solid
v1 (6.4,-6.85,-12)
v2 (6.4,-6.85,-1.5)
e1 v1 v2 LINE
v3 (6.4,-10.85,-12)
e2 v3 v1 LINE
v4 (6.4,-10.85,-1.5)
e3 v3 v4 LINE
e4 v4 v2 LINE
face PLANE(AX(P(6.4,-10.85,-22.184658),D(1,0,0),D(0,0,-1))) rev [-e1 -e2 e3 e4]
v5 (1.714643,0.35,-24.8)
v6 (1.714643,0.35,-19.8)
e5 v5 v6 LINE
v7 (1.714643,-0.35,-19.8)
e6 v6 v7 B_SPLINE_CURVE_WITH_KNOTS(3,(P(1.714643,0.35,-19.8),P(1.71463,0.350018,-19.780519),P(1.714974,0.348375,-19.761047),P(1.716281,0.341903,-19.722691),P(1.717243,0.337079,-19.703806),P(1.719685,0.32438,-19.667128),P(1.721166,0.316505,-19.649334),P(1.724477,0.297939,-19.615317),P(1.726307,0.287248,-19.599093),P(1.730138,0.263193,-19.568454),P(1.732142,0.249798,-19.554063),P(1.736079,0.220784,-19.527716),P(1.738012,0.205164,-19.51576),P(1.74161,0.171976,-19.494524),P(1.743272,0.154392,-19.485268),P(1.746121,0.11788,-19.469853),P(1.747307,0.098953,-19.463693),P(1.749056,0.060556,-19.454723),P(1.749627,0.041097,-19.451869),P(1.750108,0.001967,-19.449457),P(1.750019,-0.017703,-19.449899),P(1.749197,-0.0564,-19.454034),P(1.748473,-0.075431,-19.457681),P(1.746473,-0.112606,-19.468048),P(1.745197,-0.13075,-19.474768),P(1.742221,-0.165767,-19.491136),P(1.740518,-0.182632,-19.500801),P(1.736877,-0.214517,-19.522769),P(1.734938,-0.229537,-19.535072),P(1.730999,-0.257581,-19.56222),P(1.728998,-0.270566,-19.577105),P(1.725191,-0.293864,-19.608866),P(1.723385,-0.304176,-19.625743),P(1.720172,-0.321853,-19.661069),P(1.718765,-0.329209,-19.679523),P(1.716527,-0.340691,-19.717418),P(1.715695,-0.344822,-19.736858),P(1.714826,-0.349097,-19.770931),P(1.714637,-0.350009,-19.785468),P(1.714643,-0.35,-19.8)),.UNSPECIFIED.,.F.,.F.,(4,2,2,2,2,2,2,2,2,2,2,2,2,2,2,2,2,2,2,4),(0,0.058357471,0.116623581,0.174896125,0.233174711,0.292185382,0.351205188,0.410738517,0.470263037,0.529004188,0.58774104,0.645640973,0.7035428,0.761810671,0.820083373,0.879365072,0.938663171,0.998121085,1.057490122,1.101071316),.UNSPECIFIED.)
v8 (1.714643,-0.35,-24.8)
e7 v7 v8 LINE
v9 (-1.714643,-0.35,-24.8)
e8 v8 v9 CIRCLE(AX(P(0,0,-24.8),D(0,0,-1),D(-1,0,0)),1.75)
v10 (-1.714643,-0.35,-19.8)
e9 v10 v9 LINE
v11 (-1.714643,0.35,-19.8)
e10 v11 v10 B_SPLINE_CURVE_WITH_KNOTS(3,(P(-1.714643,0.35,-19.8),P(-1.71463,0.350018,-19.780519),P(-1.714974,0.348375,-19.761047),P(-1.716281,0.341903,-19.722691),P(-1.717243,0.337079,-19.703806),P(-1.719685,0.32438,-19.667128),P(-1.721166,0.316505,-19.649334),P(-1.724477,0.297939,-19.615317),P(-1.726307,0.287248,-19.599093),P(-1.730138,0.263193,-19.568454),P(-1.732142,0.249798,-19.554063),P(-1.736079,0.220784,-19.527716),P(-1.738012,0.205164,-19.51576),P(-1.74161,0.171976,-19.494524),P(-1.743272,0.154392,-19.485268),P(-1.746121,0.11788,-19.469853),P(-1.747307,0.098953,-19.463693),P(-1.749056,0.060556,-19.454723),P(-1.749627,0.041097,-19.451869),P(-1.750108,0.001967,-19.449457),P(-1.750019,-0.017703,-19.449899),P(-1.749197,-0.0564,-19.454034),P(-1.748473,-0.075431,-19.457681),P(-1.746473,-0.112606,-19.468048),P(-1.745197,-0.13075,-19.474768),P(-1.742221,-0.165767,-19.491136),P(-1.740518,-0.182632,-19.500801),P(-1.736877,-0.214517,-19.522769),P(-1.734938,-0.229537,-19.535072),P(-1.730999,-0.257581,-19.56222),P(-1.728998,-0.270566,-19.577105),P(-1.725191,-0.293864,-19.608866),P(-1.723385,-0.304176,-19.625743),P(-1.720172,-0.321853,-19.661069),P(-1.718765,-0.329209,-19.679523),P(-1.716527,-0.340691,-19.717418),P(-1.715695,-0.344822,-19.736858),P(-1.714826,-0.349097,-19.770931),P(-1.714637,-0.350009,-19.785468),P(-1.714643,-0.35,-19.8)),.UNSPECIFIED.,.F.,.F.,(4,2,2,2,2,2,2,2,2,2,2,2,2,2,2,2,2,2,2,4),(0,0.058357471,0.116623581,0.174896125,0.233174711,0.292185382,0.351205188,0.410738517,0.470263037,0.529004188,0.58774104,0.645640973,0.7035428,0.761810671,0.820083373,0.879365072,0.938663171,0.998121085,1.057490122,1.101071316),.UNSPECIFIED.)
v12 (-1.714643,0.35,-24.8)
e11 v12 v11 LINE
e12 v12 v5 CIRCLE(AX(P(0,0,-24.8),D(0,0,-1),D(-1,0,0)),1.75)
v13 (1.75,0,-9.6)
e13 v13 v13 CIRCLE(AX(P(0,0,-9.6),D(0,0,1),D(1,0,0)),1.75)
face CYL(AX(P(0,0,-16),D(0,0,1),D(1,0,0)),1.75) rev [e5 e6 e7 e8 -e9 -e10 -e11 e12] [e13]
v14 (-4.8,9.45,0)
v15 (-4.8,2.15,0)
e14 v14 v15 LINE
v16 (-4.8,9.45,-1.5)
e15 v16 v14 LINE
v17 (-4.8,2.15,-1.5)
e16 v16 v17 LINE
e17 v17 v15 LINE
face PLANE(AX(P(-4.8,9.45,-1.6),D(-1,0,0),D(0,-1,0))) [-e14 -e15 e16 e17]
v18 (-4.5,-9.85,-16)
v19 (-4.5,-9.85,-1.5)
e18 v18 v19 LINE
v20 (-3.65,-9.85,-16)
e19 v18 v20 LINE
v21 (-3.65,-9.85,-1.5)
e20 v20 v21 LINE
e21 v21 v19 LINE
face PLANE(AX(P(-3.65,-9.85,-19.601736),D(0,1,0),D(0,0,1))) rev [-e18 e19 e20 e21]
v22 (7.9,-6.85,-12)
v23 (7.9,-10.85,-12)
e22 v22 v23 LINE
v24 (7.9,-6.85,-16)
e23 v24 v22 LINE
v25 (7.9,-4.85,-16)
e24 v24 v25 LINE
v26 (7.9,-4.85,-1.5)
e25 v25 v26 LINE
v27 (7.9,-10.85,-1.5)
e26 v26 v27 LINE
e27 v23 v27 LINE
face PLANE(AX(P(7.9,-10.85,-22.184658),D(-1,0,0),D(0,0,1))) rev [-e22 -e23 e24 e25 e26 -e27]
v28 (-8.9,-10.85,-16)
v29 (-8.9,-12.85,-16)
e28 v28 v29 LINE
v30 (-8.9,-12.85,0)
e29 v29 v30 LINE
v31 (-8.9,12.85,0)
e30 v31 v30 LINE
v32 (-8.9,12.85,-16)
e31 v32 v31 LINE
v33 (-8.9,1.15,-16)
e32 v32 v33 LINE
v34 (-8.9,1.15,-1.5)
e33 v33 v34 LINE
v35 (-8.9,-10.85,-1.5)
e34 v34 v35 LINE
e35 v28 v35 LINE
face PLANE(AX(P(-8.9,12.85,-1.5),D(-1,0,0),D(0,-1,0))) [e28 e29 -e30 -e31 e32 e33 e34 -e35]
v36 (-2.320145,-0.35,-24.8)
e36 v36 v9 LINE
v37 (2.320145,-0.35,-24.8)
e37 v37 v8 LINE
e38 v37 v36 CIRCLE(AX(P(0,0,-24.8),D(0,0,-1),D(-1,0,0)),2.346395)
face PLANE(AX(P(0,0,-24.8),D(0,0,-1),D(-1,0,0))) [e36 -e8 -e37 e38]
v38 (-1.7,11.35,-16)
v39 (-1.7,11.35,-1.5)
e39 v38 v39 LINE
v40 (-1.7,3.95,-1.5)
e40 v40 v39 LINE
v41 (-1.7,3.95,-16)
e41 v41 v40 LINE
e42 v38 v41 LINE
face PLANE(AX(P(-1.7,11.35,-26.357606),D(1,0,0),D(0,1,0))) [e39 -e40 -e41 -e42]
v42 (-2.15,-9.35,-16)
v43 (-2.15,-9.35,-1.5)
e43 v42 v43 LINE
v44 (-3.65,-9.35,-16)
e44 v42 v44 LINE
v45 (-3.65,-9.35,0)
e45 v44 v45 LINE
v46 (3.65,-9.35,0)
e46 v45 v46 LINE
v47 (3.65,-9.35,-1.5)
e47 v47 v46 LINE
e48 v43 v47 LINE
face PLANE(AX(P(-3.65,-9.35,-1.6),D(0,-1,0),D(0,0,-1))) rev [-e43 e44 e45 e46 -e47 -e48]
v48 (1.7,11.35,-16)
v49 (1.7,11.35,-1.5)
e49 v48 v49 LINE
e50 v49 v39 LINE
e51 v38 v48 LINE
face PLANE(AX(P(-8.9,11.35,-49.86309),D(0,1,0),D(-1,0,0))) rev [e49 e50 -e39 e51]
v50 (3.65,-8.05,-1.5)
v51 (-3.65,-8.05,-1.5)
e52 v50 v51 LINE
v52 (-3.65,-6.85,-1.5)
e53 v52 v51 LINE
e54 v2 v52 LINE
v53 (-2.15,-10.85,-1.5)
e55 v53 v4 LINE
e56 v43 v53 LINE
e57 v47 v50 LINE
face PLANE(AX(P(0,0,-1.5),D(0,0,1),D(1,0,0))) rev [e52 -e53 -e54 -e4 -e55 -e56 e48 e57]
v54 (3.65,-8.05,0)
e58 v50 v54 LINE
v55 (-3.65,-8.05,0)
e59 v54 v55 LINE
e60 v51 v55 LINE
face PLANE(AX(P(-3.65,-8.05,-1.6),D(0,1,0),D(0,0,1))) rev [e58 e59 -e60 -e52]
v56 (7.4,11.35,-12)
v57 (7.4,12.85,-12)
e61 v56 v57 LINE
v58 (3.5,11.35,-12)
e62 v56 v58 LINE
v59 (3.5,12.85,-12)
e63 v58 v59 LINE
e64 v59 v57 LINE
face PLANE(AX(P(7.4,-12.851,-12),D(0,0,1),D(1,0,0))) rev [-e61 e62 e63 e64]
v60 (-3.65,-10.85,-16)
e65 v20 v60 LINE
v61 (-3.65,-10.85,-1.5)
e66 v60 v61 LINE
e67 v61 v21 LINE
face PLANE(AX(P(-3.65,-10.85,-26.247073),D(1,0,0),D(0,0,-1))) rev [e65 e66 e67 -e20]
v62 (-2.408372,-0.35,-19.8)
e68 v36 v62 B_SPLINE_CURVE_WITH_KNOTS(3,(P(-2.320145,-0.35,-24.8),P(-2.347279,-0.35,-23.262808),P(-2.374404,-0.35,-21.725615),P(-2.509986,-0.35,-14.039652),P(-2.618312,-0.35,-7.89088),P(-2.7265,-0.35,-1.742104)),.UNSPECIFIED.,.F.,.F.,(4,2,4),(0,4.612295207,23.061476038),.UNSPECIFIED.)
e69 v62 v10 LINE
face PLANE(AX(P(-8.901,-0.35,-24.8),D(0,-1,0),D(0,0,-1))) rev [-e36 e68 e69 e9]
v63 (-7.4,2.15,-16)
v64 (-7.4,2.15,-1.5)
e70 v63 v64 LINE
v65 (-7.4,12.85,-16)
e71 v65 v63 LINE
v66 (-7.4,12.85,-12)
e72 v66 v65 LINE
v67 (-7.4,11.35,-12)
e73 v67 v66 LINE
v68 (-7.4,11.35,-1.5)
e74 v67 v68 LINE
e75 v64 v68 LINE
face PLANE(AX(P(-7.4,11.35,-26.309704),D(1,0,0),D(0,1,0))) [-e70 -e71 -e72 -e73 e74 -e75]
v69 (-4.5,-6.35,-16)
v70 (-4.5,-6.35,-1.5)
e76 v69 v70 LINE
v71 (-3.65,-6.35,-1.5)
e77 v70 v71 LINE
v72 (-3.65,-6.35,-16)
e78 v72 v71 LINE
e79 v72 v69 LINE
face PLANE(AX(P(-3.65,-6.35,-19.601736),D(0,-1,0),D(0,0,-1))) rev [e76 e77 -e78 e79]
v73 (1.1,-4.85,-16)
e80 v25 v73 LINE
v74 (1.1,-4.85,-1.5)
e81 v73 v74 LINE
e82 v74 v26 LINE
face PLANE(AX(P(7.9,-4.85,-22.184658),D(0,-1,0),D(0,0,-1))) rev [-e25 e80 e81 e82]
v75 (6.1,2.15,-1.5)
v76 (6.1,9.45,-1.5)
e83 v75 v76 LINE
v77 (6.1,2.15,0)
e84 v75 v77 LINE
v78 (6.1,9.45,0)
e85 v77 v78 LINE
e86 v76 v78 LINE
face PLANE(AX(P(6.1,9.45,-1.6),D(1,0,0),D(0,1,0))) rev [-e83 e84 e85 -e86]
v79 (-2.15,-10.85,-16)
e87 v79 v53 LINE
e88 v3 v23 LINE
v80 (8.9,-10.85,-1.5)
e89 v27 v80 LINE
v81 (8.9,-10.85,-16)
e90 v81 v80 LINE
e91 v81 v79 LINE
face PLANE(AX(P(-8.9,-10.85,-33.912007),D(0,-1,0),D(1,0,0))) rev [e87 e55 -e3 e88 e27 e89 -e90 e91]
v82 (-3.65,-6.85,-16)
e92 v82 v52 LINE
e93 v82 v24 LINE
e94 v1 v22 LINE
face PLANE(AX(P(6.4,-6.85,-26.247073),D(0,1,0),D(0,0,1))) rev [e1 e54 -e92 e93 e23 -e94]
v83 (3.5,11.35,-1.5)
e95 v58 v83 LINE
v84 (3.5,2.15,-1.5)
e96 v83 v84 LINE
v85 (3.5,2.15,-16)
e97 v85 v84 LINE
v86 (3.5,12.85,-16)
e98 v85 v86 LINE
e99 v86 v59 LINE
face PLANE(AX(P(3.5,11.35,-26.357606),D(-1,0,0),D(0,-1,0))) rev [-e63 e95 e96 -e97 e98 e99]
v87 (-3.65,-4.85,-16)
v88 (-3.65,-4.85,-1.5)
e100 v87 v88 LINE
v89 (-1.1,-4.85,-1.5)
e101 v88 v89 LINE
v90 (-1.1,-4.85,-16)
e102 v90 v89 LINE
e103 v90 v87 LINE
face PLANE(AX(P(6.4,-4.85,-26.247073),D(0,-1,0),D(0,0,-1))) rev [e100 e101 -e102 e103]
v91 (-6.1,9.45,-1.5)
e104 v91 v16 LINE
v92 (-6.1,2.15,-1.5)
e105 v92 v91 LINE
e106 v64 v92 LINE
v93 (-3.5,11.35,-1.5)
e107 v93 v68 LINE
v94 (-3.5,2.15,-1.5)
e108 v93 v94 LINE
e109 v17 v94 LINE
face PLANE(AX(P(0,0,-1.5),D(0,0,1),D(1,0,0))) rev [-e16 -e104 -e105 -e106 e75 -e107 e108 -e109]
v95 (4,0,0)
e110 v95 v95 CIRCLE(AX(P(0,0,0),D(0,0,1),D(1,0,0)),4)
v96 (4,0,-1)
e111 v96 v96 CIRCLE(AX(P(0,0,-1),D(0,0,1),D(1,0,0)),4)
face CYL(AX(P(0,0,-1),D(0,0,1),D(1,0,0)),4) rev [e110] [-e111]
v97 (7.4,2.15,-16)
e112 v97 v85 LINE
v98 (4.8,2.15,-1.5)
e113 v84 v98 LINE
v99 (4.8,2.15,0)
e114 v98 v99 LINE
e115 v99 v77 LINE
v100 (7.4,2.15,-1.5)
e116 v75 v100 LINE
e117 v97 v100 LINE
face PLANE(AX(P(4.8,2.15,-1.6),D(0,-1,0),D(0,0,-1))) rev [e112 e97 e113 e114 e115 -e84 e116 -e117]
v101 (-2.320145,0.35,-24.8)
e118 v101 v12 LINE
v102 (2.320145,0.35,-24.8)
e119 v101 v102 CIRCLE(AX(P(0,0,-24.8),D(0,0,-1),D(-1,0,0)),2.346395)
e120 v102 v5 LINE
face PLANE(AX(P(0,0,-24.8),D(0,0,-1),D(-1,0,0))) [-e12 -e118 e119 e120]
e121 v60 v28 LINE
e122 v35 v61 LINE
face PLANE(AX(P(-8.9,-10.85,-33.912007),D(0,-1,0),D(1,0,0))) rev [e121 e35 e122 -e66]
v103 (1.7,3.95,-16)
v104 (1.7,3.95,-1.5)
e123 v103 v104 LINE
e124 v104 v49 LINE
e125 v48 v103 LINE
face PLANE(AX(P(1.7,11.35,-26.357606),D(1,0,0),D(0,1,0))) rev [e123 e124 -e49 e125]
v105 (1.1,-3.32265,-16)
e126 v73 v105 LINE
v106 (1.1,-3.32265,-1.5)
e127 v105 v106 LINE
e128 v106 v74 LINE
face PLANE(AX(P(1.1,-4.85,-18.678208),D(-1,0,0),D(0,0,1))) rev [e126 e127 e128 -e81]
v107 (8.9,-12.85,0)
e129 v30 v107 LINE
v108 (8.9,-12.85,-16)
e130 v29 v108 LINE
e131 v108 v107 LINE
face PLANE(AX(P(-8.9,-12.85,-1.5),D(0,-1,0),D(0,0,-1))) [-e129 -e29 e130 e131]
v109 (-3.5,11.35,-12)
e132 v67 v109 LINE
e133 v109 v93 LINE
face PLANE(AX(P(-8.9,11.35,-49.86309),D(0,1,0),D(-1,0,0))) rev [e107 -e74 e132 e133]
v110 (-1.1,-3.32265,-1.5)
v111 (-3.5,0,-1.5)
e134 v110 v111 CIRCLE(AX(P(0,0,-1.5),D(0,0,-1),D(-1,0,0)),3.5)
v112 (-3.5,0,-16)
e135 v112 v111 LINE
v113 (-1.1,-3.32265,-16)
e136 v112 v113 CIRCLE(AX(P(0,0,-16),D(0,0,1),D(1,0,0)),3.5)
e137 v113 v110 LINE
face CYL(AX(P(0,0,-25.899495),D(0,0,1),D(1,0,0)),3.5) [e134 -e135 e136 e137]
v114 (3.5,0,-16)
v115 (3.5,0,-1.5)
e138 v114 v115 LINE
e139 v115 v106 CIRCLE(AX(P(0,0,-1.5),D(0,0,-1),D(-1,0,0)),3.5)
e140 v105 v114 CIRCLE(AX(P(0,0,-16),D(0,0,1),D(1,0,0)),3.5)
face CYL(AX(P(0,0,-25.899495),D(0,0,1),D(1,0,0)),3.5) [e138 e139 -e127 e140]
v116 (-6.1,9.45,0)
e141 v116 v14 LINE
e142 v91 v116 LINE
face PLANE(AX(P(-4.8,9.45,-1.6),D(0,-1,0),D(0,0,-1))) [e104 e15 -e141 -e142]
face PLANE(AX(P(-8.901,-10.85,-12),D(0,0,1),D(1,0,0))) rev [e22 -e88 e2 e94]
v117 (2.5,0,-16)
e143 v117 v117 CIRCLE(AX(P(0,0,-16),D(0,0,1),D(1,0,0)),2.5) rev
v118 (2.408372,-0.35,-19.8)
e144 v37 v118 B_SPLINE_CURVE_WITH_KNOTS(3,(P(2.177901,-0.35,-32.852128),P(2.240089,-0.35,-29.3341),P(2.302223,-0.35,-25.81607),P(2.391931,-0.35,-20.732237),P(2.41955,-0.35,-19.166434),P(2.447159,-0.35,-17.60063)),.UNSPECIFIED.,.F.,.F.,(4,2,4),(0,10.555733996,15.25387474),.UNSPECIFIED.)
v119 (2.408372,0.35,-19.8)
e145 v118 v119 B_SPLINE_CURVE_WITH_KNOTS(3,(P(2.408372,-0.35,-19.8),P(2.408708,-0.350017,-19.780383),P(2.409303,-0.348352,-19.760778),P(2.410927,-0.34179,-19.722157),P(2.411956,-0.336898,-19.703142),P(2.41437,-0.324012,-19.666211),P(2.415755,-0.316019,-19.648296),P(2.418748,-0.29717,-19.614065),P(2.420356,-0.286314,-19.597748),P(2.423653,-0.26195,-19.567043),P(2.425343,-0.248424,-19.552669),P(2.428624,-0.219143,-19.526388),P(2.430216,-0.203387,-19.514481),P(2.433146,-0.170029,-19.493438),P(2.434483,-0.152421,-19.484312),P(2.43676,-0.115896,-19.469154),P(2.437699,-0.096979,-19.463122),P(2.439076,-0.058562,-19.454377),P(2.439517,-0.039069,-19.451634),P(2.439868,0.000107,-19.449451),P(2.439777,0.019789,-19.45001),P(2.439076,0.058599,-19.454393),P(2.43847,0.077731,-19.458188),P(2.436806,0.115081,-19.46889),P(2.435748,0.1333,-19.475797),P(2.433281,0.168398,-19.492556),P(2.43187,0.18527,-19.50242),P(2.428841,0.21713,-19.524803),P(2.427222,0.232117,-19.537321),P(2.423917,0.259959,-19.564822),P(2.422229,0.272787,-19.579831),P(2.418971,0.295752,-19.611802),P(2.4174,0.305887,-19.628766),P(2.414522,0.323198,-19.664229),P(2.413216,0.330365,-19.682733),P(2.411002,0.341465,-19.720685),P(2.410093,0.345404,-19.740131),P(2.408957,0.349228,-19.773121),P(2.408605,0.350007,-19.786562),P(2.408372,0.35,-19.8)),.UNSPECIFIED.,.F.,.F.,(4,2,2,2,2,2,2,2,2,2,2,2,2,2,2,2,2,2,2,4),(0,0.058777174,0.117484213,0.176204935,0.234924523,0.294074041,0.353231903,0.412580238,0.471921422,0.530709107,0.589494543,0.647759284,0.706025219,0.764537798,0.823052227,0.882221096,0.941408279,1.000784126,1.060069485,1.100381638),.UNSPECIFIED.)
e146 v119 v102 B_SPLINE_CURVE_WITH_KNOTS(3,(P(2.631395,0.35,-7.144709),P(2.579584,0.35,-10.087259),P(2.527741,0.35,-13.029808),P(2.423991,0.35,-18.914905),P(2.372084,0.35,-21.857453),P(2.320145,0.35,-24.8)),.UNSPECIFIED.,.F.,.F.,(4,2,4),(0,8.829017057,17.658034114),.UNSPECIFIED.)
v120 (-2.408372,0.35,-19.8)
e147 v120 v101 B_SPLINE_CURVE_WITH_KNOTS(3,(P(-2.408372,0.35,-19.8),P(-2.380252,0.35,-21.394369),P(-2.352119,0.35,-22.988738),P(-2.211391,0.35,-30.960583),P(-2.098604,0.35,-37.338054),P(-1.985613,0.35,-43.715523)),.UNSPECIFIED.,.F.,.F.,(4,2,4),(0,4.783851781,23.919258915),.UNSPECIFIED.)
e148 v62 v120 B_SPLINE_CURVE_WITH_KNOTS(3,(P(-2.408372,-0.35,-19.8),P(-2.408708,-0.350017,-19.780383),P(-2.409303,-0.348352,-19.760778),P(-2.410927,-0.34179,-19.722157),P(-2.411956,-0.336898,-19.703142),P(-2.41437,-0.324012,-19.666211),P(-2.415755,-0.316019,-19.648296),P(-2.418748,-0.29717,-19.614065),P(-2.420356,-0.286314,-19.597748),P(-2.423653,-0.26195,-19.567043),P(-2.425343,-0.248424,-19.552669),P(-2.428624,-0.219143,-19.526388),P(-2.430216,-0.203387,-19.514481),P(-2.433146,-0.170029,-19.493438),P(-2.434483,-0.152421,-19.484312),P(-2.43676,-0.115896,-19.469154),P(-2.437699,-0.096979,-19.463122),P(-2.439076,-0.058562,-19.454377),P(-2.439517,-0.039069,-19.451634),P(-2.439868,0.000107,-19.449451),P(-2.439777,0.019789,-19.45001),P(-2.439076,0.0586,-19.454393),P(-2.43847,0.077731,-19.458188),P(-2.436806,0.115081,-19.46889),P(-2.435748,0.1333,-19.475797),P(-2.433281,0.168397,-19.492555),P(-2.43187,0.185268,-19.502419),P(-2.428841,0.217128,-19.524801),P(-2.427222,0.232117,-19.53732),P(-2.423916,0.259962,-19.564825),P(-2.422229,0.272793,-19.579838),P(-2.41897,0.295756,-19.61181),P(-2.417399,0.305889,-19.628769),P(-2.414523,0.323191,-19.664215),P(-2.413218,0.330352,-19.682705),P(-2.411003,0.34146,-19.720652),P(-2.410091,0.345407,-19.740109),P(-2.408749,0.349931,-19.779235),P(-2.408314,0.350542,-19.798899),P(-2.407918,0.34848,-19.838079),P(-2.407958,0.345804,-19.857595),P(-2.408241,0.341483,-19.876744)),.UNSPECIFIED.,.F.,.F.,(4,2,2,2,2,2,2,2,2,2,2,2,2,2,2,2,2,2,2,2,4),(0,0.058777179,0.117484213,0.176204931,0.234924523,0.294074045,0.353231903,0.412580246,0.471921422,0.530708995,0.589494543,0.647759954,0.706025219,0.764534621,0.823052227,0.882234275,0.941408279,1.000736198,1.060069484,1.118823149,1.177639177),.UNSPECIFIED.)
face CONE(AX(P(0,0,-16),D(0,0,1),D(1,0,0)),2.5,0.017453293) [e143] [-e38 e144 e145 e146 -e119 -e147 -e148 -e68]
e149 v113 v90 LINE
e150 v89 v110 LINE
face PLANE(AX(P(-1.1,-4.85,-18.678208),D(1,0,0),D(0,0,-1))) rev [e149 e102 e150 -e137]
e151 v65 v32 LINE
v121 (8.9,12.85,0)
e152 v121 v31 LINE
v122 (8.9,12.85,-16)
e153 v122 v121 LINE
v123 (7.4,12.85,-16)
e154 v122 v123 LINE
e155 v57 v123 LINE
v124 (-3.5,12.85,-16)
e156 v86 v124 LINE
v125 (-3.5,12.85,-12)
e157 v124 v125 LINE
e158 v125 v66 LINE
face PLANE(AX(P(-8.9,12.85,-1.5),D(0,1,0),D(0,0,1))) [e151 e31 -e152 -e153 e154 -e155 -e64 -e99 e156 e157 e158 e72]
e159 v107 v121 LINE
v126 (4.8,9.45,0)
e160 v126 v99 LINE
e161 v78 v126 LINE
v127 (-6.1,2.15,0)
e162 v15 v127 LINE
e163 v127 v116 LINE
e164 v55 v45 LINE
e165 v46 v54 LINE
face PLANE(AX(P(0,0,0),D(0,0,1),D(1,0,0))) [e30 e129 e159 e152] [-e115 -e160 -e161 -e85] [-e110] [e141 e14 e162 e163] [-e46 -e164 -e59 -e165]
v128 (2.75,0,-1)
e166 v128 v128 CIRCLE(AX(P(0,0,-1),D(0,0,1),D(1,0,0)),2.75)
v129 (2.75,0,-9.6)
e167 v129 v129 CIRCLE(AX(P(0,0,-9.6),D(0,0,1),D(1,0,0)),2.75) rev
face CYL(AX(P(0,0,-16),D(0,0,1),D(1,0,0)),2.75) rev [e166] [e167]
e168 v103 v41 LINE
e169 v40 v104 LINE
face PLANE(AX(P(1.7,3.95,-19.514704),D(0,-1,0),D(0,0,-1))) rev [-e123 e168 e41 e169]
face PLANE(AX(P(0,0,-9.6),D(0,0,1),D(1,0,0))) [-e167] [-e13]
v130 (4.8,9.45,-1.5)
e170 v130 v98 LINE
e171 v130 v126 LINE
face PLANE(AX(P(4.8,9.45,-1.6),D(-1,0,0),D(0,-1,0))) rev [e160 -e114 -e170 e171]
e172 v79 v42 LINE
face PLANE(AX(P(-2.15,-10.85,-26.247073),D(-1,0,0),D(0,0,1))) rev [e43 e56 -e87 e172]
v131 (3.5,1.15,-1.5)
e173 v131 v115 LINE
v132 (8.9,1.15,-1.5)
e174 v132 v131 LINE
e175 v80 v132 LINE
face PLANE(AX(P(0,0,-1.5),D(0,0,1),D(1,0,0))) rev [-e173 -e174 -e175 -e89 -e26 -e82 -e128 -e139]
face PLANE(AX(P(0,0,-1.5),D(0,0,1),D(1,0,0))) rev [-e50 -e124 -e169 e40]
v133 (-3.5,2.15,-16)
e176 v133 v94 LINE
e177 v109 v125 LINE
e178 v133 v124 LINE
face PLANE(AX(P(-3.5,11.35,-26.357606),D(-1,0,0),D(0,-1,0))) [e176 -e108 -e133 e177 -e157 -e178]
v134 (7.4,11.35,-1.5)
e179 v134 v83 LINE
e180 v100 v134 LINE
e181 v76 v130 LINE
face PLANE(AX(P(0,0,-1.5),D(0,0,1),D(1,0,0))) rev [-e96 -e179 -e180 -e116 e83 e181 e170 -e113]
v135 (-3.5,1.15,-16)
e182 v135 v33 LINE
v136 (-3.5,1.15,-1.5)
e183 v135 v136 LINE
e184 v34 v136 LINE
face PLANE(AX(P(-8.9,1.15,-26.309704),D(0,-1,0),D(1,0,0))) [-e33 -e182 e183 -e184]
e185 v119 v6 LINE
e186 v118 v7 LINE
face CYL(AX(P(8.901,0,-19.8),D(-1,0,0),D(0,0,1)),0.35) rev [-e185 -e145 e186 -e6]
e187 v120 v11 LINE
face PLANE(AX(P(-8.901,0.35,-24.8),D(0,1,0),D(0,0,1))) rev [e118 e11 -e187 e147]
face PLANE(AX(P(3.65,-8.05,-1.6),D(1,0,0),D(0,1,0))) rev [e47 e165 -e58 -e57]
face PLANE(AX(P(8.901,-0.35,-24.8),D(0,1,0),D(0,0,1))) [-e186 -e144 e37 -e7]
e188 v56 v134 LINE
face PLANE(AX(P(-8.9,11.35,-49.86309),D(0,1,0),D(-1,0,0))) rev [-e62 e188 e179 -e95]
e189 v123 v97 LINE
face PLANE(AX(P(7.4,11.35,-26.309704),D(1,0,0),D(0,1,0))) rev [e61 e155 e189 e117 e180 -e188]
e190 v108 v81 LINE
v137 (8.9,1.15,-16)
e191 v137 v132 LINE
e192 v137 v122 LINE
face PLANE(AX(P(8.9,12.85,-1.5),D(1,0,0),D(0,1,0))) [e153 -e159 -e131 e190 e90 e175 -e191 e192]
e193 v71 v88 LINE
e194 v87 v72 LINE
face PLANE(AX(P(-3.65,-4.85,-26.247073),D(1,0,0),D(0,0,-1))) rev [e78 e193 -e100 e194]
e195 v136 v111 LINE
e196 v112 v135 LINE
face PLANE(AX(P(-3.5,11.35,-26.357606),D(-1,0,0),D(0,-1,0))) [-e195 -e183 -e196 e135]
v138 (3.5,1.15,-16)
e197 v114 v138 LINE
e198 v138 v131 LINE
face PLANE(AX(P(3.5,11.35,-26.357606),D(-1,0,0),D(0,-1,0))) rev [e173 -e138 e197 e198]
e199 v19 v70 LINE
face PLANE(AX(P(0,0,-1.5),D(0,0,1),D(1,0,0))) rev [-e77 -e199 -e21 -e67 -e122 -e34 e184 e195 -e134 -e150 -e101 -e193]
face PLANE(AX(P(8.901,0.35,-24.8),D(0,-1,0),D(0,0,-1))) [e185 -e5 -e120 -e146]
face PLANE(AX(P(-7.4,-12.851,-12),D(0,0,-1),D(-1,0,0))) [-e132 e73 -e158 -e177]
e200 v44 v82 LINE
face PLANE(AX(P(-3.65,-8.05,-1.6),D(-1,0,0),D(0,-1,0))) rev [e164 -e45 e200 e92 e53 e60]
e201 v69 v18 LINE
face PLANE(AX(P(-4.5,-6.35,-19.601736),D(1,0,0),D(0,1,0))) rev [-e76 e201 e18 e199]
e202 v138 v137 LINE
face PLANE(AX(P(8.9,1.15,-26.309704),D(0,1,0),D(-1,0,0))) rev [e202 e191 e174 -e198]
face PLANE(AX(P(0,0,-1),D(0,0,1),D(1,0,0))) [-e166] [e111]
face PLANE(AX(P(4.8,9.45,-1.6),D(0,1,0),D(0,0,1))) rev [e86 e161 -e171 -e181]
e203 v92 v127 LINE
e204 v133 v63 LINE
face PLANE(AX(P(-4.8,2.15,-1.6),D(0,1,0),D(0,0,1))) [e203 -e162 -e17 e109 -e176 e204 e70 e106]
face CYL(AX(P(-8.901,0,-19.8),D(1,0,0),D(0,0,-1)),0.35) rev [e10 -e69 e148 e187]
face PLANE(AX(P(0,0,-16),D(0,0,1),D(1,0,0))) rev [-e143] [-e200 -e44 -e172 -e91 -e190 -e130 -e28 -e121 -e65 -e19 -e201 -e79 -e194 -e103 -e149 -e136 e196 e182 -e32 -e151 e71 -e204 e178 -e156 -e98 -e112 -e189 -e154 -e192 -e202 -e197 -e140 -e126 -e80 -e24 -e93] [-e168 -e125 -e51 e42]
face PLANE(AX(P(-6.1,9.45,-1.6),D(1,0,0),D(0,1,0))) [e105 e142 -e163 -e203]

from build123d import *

# Parameters (mm, degrees)
BASES_W                              = 17.8
BASES_H                              = 25.7
BASE_DEPTH                           = 1.5
NEUTRALS_W                           = 1.3
NEUTRALS_H                           = 7.3
NEUTRAL_DEPTH                        = 1.6
FASTENERACCESSS_R                    = 4
FASTENER_ACCESS_DEPTH                = 1
GROUNDS_W                            = 7.3
GROUNDS_H                            = 1.3
GROUND_DEPTH                         = 1.6
BASETOPS_W                           = 17.8
BASETOPS_H                           = 1.5
BASE_TOP_DEPTH                       = 14.5
BASERIGHTWALLS_W                     = 1.5
BASERIGHTWALLS_H                     = 10.2
BASE_RIGHT_WALL_DEPTH                = 14.5
CONNECTORWALLS_W                     = 1.8
CONNECTORWALLS_H                     = 10.2
CONNECTOR_WALL_DEPTH                 = 14.5
CONNECTOR_LOCATE_REACH               = 33.555
CONNECTORLOCATES_W                   = 3.9
CONNECTORLOCATES_H                   = 4
BASEBOTTOMS_W                        = 17.8
BASEBOTTOMS_H                        = 2
BASE_BOTTOM_DEPTH                    = 14.5
FASTENERACCESSHOLEEXTENDS_R          = 2.75
FASTENER_ACCESS_HOLE_EXTEND_DEPTH    = 22.664083179
FASTENER_HOLDING_BODY_DEPTH          = 14.5
FASTENERHOLDINGTOPBORES_R            = 2.75
FASTENER_HOLDING_TOP_BORE_DEPTH      = 8.1
FASTENERHOLDINGBORES_R               = 1.75
FASTENER_HOLDING_BORE_DEPTH          = 19.343731899
ELECTRICALCONNECTIONBASES_W          = 3.9
ELECTRICALCONNECTIONBASES_H          = 1
ELECTRICAL_CONNECTION_BASE_DEPTH     = 14.5
CONNECTIONS_MIDWALL_JOINT_DEPTH      = 14.5
FASTENERHOLDINGEXTENDEDBODYS_R       = 2.5
FASTENERHOLDINGEXTENDEDBODYS_R_2     = 1.75
FASTENER_HOLDING_EXTENDED_BODY_DEPTH = 8.8
FHEB_SLOT_REACH                      = 31.315
FHEB_SLOT_DIRECTION_2_REACH          = 31.315
MIDWALLENDS_W                        = 2.2
MIDWALLENDS_H                        = 1.527350455
MID_WALL_END_DEPTH                   = 14.5
GROUNDWALLS_W                        = 1.5
GROUNDWALLS_H                        = 6
GROUND_WALL_DEPTH                    = 14.5
GROUNDEXTENDEDWALLSS_W               = 10.05
GROUNDEXTENDEDWALLSS_H               = 2
GROUNDEXTENDEDWALLSS_W_2             = 1.5
GROUNDEXTENDEDWALLSS_H_2             = 1.5
GROUND_EXTENDED_WALLS_DEPTH          = 14.5
GROUNDENDWALLS_W                     = 0.85
GROUNDENDWALLS_H                     = 3.5
GROUND_END_WALL_DEPTH                = 14.5
GROUND_CONNECTOR_LOCATE_REACH        = 34.595
GROUNDCONNECTORLOCATES_W             = 4
GROUNDCONNECTORLOCATES_H             = 4


# Read off the part's stored shape, not the designer's step: FHEB DRAFT
with BuildPart() as part:
    # BaseS → BASE (new body)
    with BuildSketch(Plane.XY):
        Rectangle(BASES_W, BASES_H)
    extrude(amount=-BASE_DEPTH)

    # NeutralS → NEUTRAL (cut)
    with BuildSketch(Plane.XY):
        with Locations((5.45, 5.8)):
            Rectangle(NEUTRALS_W, NEUTRALS_H)
    neutral = extrude(amount=-NEUTRAL_DEPTH, mode=Mode.SUBTRACT)

    # LINE HM: NEUTRAL across plane
    add(neutral.mirror(Plane(origin=(0, 0, 0), x_dir=(0, 0, 1), z_dir=(1, 0, 0))), mode=Mode.SUBTRACT)

    # FastenerAccessS → FASTENER ACCESS (cut)
    with BuildSketch(Plane.XY):
        Circle(FASTENERACCESSS_R)
    extrude(amount=-FASTENER_ACCESS_DEPTH, mode=Mode.SUBTRACT)

    # GroundS → GROUND (cut)
    with BuildSketch(Plane.XY):
        with Locations((0, -8.7)):
            Rectangle(GROUNDS_W, GROUNDS_H)
    extrude(amount=-GROUND_DEPTH, mode=Mode.SUBTRACT)

    # BaseTopS → BASE TOP (add)
    with BuildSketch(Plane(origin=(0, 0, -1.5), x_dir=(-1, 0, 0), z_dir=(0, 0, -1))):
        with Locations((0, 12.1)):
            Rectangle(BASETOPS_W, BASETOPS_H)
    extrude(amount=BASE_TOP_DEPTH)

    # BaseRightWallS → BASE RIGHT WALL (add)
    with BuildSketch(Plane(origin=(0, 0, -1.5), x_dir=(-1, 0, 0), z_dir=(0, 0, -1))):
        with Locations((-8.15, 6.25)):
            Rectangle(BASERIGHTWALLS_W, BASERIGHTWALLS_H)
    base_right_wall = extrude(amount=BASE_RIGHT_WALL_DEPTH)

    # ConnectorWallS → CONNECTOR WALL (add)
    with BuildSketch(Plane(origin=(0, 0, -1.5), x_dir=(-1, 0, 0), z_dir=(0, 0, -1))):
        with Locations((-2.6, 6.25)):
            Rectangle(CONNECTORWALLS_W, CONNECTORWALLS_H)
    connector_wall = extrude(amount=CONNECTOR_WALL_DEPTH)

    # ConnectorLocateS → CONNECTOR LOCATE (cut, up to next)
    with BuildSketch(Plane(origin=(0, 12.85, 0), x_dir=(-1, 0, 0), z_dir=(0, 1, 0)), mode=Mode.PRIVATE) as connector_locate_sk1:
        with Locations((-5.45, -14)):
            Rectangle(CONNECTORLOCATES_W, CONNECTORLOCATES_H)
    connector_locate_tool1 = extrude(connector_locate_sk1.sketch, amount=-CONNECTOR_LOCATE_REACH, mode=Mode.PRIVATE) & part.part
    connector_locate = connector_locate_tool1.solids().sort_by_distance((5.45, 12.85, -14))[0]
    add(connector_locate, mode=Mode.SUBTRACT)

    # CW CL HM: BASE RIGHT WALL, CONNECTOR WALL, CONNECTOR LOCATE across plane
    add(base_right_wall.mirror(Plane(origin=(0, 0, 0), x_dir=(0, 0, 1), z_dir=(1, 0, 0))))
    add(connector_wall.mirror(Plane(origin=(0, 0, 0), x_dir=(0, 0, 1), z_dir=(1, 0, 0))))
    add(connector_locate.mirror(Plane(origin=(0, 0, 0), x_dir=(0, 0, 1), z_dir=(1, 0, 0))), mode=Mode.SUBTRACT)

    # BaseBottomS → BASE BOTTOM (add)
    with BuildSketch(Plane(origin=(0, 0, -1.5), x_dir=(-1, 0, 0), z_dir=(0, 0, -1))):
        with Locations((0, -11.85)):
            Rectangle(BASEBOTTOMS_W, BASEBOTTOMS_H)
    extrude(amount=BASE_BOTTOM_DEPTH)

    # FastenerAccessHoleExtendS → FASTENER ACCESS HOLE EXTEND (cut, through all)
    with BuildSketch(Plane.XY.offset(-1)):
        Circle(FASTENERACCESSHOLEEXTENDS_R)
    extrude(amount=-FASTENER_ACCESS_HOLE_EXTEND_DEPTH, mode=Mode.SUBTRACT)

    # FastenerHoldingBodyS → FASTENER HOLDING BODY (add)
    with BuildSketch(Plane(origin=(0, 0, -1.5), x_dir=(-1, 0, 0), z_dir=(0, 0, -1))):
        with BuildLine():
            Line((-3.5, 0), (-3.5, 1.15))
            Line((-3.5, 1.15), (-3.305676935, 1.15))
            ThreePointArc((-3.305676935, 1.15), (0, 3.5), (3.305676935, 1.15))
            Line((3.305676935, 1.15), (3.5, 1.15))
            Line((3.5, 1.15), (3.5, 0))
            ThreePointArc((3.5, 0), (0, -3.5), (-3.5, 0))
        make_face()
    extrude(amount=FASTENER_HOLDING_BODY_DEPTH)

    # FastenerHoldingTopBoreS → FASTENER HOLDING TOP BORE (cut)
    with BuildSketch(Plane.XY.offset(-1.5)):
        Circle(FASTENERHOLDINGTOPBORES_R)
    extrude(amount=-FASTENER_HOLDING_TOP_BORE_DEPTH, mode=Mode.SUBTRACT)

    # FastenerHoldingBoreS → FASTENER HOLDING BORE (cut, through all)
    with BuildSketch(Plane.XY.offset(-9.6)):
        Circle(FASTENERHOLDINGBORES_R)
    extrude(amount=-FASTENER_HOLDING_BORE_DEPTH, mode=Mode.SUBTRACT)

    # ElectricalConnectionBaseS → ELECTRICAL CONNECTION BASE (add)
    with BuildSketch(Plane(origin=(0, 0, -1.5), x_dir=(-1, 0, 0), z_dir=(0, 0, -1))):
        with Locations((-5.45, 1.65)):
            Rectangle(ELECTRICALCONNECTIONBASES_W, ELECTRICALCONNECTIONBASES_H)
        with Locations((5.45, 1.65)):
            Rectangle(ELECTRICALCONNECTIONBASES_W, ELECTRICALCONNECTIONBASES_H)
    extrude(amount=ELECTRICAL_CONNECTION_BASE_DEPTH)

    # ConnectionsMidwallJointS → CONNECTIONS MIDWALL JOINT (add)
    with BuildSketch(Plane(origin=(0, 0, -1.5), x_dir=(-1, 0, 0), z_dir=(0, 0, -1))):
        with BuildLine():
            Line((-1.7, 3.95), (1.7, 3.95))
            Line((1.7, 3.95), (1.7, 3.059411708))
            ThreePointArc((1.7, 3.059411708), (0, 3.5), (-1.7, 3.059411708))
            Line((-1.7, 3.059411708), (-1.7, 3.95))
        make_face()
    extrude(amount=CONNECTIONS_MIDWALL_JOINT_DEPTH)

    # FastenerHoldingExtendedBodyS → FASTENER HOLDING EXTENDED BODY (add)
    with BuildSketch(Plane(origin=(0, 0, -16), x_dir=(-1, 0, 0), z_dir=(0, 0, -1))):
        with Locations(Location((0, 0, 0), (0, 0, 180))):
            Circle(FASTENERHOLDINGEXTENDEDBODYS_R)
        with Locations(Location((0, 0, 0), (0, 0, 180))):
            Circle(FASTENERHOLDINGEXTENDEDBODYS_R_2, mode=Mode.SUBTRACT)
    extrude(amount=FASTENER_HOLDING_EXTENDED_BODY_DEPTH)

    # FHEBSlotS → FHEB SLOT (cut, up to next)
    with BuildSketch(Plane(origin=(0, 0, 0), x_dir=(0, 0, -1), z_dir=(1, 0, 0)), mode=Mode.PRIVATE) as fheb_slot_sk1:
        with BuildLine():
            Line((24.8, -0.35), (19.8, -0.35))
            ThreePointArc((19.8, -0.35), (19.45, 0), (19.8, 0.35))
            Line((19.8, 0.35), (24.8, 0.35))
            Line((24.8, 0.35), (24.8, -0.35))
        make_face()
    fheb_slot_tool1 = extrude(fheb_slot_sk1.sketch, amount=-FHEB_SLOT_REACH, mode=Mode.PRIVATE) & part.part
    add(fheb_slot_tool1.solids().sort_by_distance((0, 0, -22.161977))[0], mode=Mode.SUBTRACT)

    # FHEBSlotS → FHEB SLOT direction 2 (cut, up to next)
    with BuildSketch(Plane(origin=(0, 0, 0), x_dir=(0, 0, -1), z_dir=(1, 0, 0)), mode=Mode.PRIVATE) as fheb_slot_direction_2_sk1:
        with BuildLine():
            Line((24.8, -0.35), (19.8, -0.35))
            ThreePointArc((19.8, -0.35), (19.45, 0), (19.8, 0.35))
            Line((19.8, 0.35), (24.8, 0.35))
            Line((24.8, 0.35), (24.8, -0.35))
        make_face()
    fheb_slot_direction_2_tool1 = extrude(fheb_slot_direction_2_sk1.sketch, amount=FHEB_SLOT_DIRECTION_2_REACH, mode=Mode.PRIVATE) & part.part
    add(fheb_slot_direction_2_tool1.solids().sort_by_distance((0, 0, -22.161977))[0], mode=Mode.SUBTRACT)

    # MidWallEndS → MID WALL END (add)
    with BuildSketch(Plane(origin=(0, 0, -1.5), x_dir=(-1, 0, 0), z_dir=(0, 0, -1))):
        with Locations((0, -4.086324773)):
            Rectangle(MIDWALLENDS_W, MIDWALLENDS_H)
    extrude(amount=MID_WALL_END_DEPTH)

    # GroundWallS → GROUND WALL (add)
    with BuildSketch(Plane(origin=(0, 0, -1.5), x_dir=(-1, 0, 0), z_dir=(0, 0, -1))):
        with Locations((-7.15, -7.85)):
            Rectangle(GROUNDWALLS_W, GROUNDWALLS_H)
    extrude(amount=GROUND_WALL_DEPTH)

    # GroundExtendedWallsS → GROUND EXTENDED WALLS (add)
    with BuildSketch(Plane(origin=(0, 0, -1.5), x_dir=(-1, 0, 0), z_dir=(0, 0, -1))):
        with Locations((-1.375, -5.85)):
            Rectangle(GROUNDEXTENDEDWALLSS_W, GROUNDEXTENDEDWALLSS_H)
        with Locations((2.9, -10.1)):
            Rectangle(GROUNDEXTENDEDWALLSS_W_2, GROUNDEXTENDEDWALLSS_H_2)
    extrude(amount=GROUND_EXTENDED_WALLS_DEPTH)

    # GroundEndWallS → GROUND END WALL (add)
    with BuildSketch(Plane(origin=(0, 0, -1.5), x_dir=(-1, 0, 0), z_dir=(0, 0, -1))):
        with Locations((4.075, -8.1)):
            Rectangle(GROUNDENDWALLS_W, GROUNDENDWALLS_H)
    extrude(amount=GROUND_END_WALL_DEPTH)

    # FHEB DRAFT outline → FHEB DRAFT (revolve, cut)
    with BuildSketch(Plane.XZ):
        Polygon((2.5, -16), (2.346395429, -24.8), (2.5, -24.8), align=None)
    revolve(axis=Axis((0, 0, 0), (0, 0, 1)), mode=Mode.SUBTRACT)

    # GroundConnectorLocateS → GROUND CONNECTOR LOCATE (cut, up to next)
    with BuildSketch(Plane(origin=(7.9, 0, 0), x_dir=(0, 0, -1), z_dir=(1, 0, 0)), mode=Mode.PRIVATE) as ground_connector_locate_sk1:
        with Locations((14, -8.85)):
            Rectangle(GROUNDCONNECTORLOCATES_W, GROUNDCONNECTORLOCATES_H)
    ground_connector_locate_tool1 = extrude(ground_connector_locate_sk1.sketch, amount=-GROUND_CONNECTOR_LOCATE_REACH, mode=Mode.PRIVATE) & part.part
    add(ground_connector_locate_tool1.solids().sort_by_distance((7.9, -8.85, -14))[0], mode=Mode.SUBTRACT)


solid = part.part
